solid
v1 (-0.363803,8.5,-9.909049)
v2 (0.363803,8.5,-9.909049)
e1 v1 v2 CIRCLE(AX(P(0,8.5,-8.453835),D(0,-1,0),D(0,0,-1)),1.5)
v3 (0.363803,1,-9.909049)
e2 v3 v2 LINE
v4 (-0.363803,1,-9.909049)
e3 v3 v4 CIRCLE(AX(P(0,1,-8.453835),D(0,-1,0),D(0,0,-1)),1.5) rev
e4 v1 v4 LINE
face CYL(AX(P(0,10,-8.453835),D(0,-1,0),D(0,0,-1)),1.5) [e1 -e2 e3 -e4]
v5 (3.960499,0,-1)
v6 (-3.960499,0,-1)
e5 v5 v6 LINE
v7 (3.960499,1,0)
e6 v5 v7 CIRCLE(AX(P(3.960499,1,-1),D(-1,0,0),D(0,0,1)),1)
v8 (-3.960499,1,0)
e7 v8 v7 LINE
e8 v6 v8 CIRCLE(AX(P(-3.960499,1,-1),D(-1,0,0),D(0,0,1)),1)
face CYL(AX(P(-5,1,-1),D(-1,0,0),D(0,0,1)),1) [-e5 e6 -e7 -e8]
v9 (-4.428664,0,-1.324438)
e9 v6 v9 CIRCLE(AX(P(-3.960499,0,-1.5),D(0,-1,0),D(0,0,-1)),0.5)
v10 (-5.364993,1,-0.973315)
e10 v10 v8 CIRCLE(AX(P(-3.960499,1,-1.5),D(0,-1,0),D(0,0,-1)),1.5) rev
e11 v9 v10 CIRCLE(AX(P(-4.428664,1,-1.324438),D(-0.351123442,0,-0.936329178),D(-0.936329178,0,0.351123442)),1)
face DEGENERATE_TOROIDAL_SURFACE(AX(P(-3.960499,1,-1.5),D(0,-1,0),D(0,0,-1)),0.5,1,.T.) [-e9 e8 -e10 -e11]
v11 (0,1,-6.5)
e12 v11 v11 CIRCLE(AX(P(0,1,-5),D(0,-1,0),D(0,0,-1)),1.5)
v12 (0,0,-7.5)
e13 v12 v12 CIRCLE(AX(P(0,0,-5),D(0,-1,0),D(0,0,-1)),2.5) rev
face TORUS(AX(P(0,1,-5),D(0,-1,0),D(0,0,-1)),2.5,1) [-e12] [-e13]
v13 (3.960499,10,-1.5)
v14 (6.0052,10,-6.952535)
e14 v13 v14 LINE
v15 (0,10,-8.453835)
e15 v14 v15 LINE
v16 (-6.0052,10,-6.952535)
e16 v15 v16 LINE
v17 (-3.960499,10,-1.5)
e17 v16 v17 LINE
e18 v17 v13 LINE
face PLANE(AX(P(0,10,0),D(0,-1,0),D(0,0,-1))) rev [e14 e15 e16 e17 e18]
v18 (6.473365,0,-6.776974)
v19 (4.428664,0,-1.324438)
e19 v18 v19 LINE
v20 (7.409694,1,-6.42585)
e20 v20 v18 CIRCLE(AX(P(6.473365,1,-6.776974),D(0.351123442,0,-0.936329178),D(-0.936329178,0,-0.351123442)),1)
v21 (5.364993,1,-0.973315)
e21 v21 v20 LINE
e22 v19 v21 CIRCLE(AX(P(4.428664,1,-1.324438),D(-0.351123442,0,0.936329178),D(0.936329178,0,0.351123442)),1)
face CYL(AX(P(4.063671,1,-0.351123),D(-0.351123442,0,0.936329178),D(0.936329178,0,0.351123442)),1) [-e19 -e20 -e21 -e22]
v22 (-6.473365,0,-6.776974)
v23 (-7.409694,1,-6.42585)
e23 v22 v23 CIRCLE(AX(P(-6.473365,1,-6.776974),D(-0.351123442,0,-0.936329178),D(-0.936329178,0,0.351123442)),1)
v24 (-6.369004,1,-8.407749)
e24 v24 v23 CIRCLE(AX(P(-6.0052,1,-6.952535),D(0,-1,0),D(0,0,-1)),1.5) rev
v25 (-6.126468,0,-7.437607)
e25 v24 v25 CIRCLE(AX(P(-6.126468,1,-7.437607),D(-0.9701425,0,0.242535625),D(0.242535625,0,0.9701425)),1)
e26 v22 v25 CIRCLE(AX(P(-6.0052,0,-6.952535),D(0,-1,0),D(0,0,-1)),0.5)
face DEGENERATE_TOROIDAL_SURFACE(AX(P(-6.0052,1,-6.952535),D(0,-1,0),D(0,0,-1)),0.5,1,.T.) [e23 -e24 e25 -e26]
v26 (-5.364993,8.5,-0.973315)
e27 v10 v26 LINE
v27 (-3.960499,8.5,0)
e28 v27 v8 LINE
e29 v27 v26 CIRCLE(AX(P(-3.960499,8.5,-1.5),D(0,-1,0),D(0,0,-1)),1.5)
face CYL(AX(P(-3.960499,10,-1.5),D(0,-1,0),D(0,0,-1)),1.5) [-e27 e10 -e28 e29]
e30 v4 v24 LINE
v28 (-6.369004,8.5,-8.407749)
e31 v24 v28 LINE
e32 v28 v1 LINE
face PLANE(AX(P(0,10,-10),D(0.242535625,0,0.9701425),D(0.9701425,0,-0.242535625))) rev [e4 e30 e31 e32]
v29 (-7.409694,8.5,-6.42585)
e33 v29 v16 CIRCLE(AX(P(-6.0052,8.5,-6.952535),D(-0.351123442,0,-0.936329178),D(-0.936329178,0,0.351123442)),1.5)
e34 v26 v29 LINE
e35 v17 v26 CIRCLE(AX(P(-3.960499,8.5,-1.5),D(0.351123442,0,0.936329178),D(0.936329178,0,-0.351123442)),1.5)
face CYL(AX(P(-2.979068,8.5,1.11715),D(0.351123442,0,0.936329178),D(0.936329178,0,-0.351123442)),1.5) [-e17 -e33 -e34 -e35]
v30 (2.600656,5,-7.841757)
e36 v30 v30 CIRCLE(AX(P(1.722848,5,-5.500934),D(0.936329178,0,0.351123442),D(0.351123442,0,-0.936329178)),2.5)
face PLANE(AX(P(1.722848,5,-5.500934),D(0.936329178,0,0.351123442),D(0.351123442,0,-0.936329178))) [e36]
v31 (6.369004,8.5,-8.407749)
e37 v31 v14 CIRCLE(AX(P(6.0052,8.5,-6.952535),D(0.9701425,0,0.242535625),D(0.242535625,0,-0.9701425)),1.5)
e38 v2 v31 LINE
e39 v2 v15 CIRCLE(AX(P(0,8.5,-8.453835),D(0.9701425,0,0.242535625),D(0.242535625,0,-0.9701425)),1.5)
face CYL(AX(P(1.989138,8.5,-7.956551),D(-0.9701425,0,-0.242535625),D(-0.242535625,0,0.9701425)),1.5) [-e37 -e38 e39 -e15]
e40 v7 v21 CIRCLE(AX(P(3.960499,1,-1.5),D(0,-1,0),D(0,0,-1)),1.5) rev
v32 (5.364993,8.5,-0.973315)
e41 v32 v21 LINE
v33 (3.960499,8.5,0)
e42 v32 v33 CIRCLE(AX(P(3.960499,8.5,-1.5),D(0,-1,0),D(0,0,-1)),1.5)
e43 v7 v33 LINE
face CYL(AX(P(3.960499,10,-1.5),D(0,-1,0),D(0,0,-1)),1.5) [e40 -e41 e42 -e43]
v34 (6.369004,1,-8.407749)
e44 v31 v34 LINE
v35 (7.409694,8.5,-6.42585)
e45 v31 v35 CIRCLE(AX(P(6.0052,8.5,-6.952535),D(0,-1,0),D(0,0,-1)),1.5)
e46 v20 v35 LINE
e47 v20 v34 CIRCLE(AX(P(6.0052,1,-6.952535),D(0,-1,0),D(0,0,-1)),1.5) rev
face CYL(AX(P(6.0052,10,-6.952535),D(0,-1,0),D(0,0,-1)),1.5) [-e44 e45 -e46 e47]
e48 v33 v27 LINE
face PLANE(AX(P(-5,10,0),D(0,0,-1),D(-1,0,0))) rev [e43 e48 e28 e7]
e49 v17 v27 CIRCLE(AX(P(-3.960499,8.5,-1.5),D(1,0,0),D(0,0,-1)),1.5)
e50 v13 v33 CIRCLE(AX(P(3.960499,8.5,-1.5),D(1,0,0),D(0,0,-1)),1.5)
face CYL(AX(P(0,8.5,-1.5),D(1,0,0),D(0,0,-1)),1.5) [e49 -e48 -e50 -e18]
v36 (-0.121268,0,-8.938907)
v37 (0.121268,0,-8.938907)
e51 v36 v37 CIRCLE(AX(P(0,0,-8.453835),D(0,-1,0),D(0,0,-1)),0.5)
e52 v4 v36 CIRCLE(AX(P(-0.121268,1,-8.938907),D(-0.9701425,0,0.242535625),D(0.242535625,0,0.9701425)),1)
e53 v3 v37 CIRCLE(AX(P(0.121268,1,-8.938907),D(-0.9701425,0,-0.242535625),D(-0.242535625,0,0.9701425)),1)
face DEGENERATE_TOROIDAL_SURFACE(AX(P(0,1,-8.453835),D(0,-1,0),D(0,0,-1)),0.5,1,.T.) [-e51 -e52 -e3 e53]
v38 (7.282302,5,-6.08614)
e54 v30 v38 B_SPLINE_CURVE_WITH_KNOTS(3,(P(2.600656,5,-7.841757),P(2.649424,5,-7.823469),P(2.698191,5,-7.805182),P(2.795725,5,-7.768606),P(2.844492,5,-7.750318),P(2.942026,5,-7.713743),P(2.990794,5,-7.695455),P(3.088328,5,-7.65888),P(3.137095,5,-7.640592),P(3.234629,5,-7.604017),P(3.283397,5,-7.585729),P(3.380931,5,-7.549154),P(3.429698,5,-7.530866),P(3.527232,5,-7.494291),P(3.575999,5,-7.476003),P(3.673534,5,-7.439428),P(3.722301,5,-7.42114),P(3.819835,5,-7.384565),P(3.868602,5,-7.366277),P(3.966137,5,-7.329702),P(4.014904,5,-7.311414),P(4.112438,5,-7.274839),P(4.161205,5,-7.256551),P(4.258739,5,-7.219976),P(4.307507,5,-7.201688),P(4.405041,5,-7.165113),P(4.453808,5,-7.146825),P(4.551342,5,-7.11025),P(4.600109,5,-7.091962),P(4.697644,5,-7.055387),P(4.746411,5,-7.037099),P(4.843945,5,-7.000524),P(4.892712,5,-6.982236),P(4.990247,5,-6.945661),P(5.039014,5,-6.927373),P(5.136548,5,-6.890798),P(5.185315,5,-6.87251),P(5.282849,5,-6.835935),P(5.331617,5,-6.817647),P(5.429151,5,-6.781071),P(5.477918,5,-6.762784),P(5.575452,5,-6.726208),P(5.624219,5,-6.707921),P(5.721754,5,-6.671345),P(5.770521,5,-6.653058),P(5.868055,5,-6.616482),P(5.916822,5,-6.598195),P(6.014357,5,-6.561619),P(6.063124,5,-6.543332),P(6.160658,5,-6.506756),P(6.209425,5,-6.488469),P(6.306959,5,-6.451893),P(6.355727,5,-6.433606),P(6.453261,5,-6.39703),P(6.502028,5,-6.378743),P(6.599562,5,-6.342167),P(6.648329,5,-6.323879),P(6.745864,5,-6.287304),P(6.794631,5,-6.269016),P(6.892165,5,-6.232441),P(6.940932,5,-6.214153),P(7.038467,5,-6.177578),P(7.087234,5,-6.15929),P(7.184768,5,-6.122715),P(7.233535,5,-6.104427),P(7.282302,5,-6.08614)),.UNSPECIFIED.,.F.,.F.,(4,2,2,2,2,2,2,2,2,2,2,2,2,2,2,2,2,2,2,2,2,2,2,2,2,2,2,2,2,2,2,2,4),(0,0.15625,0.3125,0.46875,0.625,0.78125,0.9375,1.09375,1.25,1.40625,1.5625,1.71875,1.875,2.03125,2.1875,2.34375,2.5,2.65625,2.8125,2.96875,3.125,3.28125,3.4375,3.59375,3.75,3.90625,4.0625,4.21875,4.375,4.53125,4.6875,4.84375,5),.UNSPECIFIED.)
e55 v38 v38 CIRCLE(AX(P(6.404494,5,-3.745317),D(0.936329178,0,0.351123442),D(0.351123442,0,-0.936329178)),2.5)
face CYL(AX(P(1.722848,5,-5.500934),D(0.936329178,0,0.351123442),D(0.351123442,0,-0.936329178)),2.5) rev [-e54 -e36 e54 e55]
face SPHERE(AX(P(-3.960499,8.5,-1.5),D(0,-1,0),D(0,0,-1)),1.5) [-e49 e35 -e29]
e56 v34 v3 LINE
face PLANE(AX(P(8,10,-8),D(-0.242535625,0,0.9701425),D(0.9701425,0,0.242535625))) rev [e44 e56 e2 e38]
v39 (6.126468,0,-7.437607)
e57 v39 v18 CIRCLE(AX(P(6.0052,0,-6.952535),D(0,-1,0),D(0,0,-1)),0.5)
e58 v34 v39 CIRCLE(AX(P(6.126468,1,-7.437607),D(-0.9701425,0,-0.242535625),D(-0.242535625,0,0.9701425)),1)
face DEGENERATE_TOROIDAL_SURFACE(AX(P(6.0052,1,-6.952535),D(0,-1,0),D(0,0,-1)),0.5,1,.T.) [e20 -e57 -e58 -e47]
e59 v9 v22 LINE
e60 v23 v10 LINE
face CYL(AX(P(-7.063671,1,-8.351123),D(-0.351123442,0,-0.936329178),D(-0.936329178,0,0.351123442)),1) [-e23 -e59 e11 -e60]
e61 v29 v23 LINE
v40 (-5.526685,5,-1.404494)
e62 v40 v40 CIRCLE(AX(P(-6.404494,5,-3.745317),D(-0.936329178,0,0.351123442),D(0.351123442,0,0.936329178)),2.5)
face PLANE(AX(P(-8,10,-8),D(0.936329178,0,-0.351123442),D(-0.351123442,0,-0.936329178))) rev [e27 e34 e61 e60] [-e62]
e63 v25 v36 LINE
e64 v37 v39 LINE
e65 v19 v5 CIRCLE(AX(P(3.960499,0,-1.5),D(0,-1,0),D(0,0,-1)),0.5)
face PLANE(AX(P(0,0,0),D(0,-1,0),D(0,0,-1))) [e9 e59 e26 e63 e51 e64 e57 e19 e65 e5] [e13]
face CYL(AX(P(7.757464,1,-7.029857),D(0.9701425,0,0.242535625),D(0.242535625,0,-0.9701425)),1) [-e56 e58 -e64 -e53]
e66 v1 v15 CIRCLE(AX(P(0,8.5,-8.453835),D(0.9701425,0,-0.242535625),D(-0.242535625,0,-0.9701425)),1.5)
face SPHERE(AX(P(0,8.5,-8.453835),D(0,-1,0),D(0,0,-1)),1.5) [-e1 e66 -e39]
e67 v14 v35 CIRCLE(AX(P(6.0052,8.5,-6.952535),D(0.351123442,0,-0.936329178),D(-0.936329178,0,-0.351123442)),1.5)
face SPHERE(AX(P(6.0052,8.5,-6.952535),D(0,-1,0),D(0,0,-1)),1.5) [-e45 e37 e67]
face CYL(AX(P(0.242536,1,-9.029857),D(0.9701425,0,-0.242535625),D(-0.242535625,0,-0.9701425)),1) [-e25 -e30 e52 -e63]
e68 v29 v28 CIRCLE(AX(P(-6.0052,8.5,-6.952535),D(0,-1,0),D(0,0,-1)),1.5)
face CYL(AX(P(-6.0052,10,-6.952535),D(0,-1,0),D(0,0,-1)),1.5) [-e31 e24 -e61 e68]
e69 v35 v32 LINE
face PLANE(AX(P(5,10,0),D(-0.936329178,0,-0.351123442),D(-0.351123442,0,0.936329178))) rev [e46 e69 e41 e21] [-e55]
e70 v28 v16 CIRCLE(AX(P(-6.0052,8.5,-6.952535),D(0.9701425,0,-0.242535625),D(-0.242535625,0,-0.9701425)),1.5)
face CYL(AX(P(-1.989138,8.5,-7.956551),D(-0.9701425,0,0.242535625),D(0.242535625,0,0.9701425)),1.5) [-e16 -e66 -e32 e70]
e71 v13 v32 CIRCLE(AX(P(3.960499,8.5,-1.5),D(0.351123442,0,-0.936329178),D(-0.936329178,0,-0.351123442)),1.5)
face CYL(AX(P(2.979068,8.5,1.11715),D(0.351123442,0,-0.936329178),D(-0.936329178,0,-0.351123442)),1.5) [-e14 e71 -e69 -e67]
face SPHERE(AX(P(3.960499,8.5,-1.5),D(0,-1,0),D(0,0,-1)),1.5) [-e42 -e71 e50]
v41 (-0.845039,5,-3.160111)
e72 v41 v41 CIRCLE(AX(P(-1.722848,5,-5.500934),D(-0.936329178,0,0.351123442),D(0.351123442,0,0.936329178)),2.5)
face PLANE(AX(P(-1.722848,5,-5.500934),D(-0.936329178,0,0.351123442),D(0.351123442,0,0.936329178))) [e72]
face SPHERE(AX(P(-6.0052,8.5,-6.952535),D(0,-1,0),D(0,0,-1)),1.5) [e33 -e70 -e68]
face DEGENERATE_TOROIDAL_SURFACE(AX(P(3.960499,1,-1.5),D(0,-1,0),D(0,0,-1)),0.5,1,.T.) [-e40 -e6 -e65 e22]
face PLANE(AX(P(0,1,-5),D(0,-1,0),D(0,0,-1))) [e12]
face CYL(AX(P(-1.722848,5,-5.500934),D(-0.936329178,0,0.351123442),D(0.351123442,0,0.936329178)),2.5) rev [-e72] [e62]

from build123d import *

# Parameters (mm, degrees)
BOSS_EXTRUDE1_DEPTH = 10
SKETCH2_R           = 2.5
CUT_EXTRUDE1_DEPTH  = 5
SKETCH3_R           = 2.5
CUT_EXTRUDE2_DEPTH  = 5
SKETCH4_R           = 1.5
CUT_EXTRUDE3_DEPTH  = 1
FILLET1_R           = 1.5
FILLET2_R           = 1.5
FILLET3_R           = 1


with BuildPart() as part:
    # Sketch1 → Boss-Extrude1 (new body)
    with BuildSketch(Plane(origin=(0, 0, 0), x_dir=(1, 0, 0), z_dir=(0, 1, 0))):
        Polygon((-5, 0), (5, 0), (8, 8), (0, 10), (-8, 8), align=None)
    extrude(amount=BOSS_EXTRUDE1_DEPTH)

    # Sketch2 → Cut-Extrude1 (cut)
    with BuildSketch(Plane(origin=(4.383561644, 0, 1.643835616), x_dir=(0.35112344158839154, 0, -0.9363291775690447), z_dir=(0.9363291775690445, 0, 0.3511234415883915))):
        with Locations((5.755617208, 5)):
            Circle(SKETCH2_R)
    extrude(amount=-CUT_EXTRUDE1_DEPTH, mode=Mode.SUBTRACT)

    # Sketch3 → Cut-Extrude2 (cut)
    with BuildSketch(Plane(origin=(-4.383561644, 0, 1.643835616), x_dir=(0.3511234415883919, 0, 0.9363291775690445), z_dir=(-0.9363291775690445, 0, 0.3511234415883919))):
        with Locations((-5.755617208, 5)):
            Circle(SKETCH3_R)
    extrude(amount=-CUT_EXTRUDE2_DEPTH, mode=Mode.SUBTRACT)

    # Sketch4 → Cut-Extrude3 (cut)
    with BuildSketch(Plane.XZ):
        with Locations(Location((0, -5, 0), (0, 0, 270))):
            Circle(SKETCH4_R)
    extrude(amount=-CUT_EXTRUDE3_DEPTH, mode=Mode.SUBTRACT)

    # Fillet1
    fillet1_edges = [part.edges().sort_by_distance(p)[0] for p in [
        (-8, 5, -8),
        (0, 5, -10),
        (8, 5, -8),
        (5, 5, 0),
        (-5, 5, 0),
    ]]
    fillet(fillet1_edges, radius=FILLET1_R)

    # Fillet2
    fillet2_edges = [part.edges().sort_by_distance(p)[0] for p in [
        (-3.366403469, 10, -9.158399133),
        (3.366403469, 10, -9.158399133),
        (-6.387343447, 10, -3.699582525),
        (0, 10, 0),
        (6.387343447, 10, -3.699582525),
        (7.333243577, 10, -7.649887814),
        (4.814891554, 10, -0.267111574),
        (-4.814891554, 10, -0.267111574),
        (-7.333243577, 10, -7.649887814),
        (0, 10, -9.95383539),
    ]]
    fillet(fillet2_edges, radius=FILLET2_R)

    # Fillet3
    fillet3_edges = [part.edges().sort_by_distance(p)[0] for p in [
        (0, 0, -3.5),
        (-3.366403469, 0, -9.158399133),
        (-6.387343447, 0, -3.699582525),
        (3.366403469, 0, -9.158399133),
        (6.387343447, 0, -3.699582525),
        (0, 0, 0),
        (7.333243577, 0, -7.649887814),
        (4.814891554, 0, -0.267111574),
        (-4.814891554, 0, -0.267111574),
        (-7.333243577, 0, -7.649887814),
        (0, 0, -9.95383539),
    ]]
    fillet(fillet3_edges, radius=FILLET3_R - 0.0001)  # a hair under: the kernel refuses the full size


solid = part.part
